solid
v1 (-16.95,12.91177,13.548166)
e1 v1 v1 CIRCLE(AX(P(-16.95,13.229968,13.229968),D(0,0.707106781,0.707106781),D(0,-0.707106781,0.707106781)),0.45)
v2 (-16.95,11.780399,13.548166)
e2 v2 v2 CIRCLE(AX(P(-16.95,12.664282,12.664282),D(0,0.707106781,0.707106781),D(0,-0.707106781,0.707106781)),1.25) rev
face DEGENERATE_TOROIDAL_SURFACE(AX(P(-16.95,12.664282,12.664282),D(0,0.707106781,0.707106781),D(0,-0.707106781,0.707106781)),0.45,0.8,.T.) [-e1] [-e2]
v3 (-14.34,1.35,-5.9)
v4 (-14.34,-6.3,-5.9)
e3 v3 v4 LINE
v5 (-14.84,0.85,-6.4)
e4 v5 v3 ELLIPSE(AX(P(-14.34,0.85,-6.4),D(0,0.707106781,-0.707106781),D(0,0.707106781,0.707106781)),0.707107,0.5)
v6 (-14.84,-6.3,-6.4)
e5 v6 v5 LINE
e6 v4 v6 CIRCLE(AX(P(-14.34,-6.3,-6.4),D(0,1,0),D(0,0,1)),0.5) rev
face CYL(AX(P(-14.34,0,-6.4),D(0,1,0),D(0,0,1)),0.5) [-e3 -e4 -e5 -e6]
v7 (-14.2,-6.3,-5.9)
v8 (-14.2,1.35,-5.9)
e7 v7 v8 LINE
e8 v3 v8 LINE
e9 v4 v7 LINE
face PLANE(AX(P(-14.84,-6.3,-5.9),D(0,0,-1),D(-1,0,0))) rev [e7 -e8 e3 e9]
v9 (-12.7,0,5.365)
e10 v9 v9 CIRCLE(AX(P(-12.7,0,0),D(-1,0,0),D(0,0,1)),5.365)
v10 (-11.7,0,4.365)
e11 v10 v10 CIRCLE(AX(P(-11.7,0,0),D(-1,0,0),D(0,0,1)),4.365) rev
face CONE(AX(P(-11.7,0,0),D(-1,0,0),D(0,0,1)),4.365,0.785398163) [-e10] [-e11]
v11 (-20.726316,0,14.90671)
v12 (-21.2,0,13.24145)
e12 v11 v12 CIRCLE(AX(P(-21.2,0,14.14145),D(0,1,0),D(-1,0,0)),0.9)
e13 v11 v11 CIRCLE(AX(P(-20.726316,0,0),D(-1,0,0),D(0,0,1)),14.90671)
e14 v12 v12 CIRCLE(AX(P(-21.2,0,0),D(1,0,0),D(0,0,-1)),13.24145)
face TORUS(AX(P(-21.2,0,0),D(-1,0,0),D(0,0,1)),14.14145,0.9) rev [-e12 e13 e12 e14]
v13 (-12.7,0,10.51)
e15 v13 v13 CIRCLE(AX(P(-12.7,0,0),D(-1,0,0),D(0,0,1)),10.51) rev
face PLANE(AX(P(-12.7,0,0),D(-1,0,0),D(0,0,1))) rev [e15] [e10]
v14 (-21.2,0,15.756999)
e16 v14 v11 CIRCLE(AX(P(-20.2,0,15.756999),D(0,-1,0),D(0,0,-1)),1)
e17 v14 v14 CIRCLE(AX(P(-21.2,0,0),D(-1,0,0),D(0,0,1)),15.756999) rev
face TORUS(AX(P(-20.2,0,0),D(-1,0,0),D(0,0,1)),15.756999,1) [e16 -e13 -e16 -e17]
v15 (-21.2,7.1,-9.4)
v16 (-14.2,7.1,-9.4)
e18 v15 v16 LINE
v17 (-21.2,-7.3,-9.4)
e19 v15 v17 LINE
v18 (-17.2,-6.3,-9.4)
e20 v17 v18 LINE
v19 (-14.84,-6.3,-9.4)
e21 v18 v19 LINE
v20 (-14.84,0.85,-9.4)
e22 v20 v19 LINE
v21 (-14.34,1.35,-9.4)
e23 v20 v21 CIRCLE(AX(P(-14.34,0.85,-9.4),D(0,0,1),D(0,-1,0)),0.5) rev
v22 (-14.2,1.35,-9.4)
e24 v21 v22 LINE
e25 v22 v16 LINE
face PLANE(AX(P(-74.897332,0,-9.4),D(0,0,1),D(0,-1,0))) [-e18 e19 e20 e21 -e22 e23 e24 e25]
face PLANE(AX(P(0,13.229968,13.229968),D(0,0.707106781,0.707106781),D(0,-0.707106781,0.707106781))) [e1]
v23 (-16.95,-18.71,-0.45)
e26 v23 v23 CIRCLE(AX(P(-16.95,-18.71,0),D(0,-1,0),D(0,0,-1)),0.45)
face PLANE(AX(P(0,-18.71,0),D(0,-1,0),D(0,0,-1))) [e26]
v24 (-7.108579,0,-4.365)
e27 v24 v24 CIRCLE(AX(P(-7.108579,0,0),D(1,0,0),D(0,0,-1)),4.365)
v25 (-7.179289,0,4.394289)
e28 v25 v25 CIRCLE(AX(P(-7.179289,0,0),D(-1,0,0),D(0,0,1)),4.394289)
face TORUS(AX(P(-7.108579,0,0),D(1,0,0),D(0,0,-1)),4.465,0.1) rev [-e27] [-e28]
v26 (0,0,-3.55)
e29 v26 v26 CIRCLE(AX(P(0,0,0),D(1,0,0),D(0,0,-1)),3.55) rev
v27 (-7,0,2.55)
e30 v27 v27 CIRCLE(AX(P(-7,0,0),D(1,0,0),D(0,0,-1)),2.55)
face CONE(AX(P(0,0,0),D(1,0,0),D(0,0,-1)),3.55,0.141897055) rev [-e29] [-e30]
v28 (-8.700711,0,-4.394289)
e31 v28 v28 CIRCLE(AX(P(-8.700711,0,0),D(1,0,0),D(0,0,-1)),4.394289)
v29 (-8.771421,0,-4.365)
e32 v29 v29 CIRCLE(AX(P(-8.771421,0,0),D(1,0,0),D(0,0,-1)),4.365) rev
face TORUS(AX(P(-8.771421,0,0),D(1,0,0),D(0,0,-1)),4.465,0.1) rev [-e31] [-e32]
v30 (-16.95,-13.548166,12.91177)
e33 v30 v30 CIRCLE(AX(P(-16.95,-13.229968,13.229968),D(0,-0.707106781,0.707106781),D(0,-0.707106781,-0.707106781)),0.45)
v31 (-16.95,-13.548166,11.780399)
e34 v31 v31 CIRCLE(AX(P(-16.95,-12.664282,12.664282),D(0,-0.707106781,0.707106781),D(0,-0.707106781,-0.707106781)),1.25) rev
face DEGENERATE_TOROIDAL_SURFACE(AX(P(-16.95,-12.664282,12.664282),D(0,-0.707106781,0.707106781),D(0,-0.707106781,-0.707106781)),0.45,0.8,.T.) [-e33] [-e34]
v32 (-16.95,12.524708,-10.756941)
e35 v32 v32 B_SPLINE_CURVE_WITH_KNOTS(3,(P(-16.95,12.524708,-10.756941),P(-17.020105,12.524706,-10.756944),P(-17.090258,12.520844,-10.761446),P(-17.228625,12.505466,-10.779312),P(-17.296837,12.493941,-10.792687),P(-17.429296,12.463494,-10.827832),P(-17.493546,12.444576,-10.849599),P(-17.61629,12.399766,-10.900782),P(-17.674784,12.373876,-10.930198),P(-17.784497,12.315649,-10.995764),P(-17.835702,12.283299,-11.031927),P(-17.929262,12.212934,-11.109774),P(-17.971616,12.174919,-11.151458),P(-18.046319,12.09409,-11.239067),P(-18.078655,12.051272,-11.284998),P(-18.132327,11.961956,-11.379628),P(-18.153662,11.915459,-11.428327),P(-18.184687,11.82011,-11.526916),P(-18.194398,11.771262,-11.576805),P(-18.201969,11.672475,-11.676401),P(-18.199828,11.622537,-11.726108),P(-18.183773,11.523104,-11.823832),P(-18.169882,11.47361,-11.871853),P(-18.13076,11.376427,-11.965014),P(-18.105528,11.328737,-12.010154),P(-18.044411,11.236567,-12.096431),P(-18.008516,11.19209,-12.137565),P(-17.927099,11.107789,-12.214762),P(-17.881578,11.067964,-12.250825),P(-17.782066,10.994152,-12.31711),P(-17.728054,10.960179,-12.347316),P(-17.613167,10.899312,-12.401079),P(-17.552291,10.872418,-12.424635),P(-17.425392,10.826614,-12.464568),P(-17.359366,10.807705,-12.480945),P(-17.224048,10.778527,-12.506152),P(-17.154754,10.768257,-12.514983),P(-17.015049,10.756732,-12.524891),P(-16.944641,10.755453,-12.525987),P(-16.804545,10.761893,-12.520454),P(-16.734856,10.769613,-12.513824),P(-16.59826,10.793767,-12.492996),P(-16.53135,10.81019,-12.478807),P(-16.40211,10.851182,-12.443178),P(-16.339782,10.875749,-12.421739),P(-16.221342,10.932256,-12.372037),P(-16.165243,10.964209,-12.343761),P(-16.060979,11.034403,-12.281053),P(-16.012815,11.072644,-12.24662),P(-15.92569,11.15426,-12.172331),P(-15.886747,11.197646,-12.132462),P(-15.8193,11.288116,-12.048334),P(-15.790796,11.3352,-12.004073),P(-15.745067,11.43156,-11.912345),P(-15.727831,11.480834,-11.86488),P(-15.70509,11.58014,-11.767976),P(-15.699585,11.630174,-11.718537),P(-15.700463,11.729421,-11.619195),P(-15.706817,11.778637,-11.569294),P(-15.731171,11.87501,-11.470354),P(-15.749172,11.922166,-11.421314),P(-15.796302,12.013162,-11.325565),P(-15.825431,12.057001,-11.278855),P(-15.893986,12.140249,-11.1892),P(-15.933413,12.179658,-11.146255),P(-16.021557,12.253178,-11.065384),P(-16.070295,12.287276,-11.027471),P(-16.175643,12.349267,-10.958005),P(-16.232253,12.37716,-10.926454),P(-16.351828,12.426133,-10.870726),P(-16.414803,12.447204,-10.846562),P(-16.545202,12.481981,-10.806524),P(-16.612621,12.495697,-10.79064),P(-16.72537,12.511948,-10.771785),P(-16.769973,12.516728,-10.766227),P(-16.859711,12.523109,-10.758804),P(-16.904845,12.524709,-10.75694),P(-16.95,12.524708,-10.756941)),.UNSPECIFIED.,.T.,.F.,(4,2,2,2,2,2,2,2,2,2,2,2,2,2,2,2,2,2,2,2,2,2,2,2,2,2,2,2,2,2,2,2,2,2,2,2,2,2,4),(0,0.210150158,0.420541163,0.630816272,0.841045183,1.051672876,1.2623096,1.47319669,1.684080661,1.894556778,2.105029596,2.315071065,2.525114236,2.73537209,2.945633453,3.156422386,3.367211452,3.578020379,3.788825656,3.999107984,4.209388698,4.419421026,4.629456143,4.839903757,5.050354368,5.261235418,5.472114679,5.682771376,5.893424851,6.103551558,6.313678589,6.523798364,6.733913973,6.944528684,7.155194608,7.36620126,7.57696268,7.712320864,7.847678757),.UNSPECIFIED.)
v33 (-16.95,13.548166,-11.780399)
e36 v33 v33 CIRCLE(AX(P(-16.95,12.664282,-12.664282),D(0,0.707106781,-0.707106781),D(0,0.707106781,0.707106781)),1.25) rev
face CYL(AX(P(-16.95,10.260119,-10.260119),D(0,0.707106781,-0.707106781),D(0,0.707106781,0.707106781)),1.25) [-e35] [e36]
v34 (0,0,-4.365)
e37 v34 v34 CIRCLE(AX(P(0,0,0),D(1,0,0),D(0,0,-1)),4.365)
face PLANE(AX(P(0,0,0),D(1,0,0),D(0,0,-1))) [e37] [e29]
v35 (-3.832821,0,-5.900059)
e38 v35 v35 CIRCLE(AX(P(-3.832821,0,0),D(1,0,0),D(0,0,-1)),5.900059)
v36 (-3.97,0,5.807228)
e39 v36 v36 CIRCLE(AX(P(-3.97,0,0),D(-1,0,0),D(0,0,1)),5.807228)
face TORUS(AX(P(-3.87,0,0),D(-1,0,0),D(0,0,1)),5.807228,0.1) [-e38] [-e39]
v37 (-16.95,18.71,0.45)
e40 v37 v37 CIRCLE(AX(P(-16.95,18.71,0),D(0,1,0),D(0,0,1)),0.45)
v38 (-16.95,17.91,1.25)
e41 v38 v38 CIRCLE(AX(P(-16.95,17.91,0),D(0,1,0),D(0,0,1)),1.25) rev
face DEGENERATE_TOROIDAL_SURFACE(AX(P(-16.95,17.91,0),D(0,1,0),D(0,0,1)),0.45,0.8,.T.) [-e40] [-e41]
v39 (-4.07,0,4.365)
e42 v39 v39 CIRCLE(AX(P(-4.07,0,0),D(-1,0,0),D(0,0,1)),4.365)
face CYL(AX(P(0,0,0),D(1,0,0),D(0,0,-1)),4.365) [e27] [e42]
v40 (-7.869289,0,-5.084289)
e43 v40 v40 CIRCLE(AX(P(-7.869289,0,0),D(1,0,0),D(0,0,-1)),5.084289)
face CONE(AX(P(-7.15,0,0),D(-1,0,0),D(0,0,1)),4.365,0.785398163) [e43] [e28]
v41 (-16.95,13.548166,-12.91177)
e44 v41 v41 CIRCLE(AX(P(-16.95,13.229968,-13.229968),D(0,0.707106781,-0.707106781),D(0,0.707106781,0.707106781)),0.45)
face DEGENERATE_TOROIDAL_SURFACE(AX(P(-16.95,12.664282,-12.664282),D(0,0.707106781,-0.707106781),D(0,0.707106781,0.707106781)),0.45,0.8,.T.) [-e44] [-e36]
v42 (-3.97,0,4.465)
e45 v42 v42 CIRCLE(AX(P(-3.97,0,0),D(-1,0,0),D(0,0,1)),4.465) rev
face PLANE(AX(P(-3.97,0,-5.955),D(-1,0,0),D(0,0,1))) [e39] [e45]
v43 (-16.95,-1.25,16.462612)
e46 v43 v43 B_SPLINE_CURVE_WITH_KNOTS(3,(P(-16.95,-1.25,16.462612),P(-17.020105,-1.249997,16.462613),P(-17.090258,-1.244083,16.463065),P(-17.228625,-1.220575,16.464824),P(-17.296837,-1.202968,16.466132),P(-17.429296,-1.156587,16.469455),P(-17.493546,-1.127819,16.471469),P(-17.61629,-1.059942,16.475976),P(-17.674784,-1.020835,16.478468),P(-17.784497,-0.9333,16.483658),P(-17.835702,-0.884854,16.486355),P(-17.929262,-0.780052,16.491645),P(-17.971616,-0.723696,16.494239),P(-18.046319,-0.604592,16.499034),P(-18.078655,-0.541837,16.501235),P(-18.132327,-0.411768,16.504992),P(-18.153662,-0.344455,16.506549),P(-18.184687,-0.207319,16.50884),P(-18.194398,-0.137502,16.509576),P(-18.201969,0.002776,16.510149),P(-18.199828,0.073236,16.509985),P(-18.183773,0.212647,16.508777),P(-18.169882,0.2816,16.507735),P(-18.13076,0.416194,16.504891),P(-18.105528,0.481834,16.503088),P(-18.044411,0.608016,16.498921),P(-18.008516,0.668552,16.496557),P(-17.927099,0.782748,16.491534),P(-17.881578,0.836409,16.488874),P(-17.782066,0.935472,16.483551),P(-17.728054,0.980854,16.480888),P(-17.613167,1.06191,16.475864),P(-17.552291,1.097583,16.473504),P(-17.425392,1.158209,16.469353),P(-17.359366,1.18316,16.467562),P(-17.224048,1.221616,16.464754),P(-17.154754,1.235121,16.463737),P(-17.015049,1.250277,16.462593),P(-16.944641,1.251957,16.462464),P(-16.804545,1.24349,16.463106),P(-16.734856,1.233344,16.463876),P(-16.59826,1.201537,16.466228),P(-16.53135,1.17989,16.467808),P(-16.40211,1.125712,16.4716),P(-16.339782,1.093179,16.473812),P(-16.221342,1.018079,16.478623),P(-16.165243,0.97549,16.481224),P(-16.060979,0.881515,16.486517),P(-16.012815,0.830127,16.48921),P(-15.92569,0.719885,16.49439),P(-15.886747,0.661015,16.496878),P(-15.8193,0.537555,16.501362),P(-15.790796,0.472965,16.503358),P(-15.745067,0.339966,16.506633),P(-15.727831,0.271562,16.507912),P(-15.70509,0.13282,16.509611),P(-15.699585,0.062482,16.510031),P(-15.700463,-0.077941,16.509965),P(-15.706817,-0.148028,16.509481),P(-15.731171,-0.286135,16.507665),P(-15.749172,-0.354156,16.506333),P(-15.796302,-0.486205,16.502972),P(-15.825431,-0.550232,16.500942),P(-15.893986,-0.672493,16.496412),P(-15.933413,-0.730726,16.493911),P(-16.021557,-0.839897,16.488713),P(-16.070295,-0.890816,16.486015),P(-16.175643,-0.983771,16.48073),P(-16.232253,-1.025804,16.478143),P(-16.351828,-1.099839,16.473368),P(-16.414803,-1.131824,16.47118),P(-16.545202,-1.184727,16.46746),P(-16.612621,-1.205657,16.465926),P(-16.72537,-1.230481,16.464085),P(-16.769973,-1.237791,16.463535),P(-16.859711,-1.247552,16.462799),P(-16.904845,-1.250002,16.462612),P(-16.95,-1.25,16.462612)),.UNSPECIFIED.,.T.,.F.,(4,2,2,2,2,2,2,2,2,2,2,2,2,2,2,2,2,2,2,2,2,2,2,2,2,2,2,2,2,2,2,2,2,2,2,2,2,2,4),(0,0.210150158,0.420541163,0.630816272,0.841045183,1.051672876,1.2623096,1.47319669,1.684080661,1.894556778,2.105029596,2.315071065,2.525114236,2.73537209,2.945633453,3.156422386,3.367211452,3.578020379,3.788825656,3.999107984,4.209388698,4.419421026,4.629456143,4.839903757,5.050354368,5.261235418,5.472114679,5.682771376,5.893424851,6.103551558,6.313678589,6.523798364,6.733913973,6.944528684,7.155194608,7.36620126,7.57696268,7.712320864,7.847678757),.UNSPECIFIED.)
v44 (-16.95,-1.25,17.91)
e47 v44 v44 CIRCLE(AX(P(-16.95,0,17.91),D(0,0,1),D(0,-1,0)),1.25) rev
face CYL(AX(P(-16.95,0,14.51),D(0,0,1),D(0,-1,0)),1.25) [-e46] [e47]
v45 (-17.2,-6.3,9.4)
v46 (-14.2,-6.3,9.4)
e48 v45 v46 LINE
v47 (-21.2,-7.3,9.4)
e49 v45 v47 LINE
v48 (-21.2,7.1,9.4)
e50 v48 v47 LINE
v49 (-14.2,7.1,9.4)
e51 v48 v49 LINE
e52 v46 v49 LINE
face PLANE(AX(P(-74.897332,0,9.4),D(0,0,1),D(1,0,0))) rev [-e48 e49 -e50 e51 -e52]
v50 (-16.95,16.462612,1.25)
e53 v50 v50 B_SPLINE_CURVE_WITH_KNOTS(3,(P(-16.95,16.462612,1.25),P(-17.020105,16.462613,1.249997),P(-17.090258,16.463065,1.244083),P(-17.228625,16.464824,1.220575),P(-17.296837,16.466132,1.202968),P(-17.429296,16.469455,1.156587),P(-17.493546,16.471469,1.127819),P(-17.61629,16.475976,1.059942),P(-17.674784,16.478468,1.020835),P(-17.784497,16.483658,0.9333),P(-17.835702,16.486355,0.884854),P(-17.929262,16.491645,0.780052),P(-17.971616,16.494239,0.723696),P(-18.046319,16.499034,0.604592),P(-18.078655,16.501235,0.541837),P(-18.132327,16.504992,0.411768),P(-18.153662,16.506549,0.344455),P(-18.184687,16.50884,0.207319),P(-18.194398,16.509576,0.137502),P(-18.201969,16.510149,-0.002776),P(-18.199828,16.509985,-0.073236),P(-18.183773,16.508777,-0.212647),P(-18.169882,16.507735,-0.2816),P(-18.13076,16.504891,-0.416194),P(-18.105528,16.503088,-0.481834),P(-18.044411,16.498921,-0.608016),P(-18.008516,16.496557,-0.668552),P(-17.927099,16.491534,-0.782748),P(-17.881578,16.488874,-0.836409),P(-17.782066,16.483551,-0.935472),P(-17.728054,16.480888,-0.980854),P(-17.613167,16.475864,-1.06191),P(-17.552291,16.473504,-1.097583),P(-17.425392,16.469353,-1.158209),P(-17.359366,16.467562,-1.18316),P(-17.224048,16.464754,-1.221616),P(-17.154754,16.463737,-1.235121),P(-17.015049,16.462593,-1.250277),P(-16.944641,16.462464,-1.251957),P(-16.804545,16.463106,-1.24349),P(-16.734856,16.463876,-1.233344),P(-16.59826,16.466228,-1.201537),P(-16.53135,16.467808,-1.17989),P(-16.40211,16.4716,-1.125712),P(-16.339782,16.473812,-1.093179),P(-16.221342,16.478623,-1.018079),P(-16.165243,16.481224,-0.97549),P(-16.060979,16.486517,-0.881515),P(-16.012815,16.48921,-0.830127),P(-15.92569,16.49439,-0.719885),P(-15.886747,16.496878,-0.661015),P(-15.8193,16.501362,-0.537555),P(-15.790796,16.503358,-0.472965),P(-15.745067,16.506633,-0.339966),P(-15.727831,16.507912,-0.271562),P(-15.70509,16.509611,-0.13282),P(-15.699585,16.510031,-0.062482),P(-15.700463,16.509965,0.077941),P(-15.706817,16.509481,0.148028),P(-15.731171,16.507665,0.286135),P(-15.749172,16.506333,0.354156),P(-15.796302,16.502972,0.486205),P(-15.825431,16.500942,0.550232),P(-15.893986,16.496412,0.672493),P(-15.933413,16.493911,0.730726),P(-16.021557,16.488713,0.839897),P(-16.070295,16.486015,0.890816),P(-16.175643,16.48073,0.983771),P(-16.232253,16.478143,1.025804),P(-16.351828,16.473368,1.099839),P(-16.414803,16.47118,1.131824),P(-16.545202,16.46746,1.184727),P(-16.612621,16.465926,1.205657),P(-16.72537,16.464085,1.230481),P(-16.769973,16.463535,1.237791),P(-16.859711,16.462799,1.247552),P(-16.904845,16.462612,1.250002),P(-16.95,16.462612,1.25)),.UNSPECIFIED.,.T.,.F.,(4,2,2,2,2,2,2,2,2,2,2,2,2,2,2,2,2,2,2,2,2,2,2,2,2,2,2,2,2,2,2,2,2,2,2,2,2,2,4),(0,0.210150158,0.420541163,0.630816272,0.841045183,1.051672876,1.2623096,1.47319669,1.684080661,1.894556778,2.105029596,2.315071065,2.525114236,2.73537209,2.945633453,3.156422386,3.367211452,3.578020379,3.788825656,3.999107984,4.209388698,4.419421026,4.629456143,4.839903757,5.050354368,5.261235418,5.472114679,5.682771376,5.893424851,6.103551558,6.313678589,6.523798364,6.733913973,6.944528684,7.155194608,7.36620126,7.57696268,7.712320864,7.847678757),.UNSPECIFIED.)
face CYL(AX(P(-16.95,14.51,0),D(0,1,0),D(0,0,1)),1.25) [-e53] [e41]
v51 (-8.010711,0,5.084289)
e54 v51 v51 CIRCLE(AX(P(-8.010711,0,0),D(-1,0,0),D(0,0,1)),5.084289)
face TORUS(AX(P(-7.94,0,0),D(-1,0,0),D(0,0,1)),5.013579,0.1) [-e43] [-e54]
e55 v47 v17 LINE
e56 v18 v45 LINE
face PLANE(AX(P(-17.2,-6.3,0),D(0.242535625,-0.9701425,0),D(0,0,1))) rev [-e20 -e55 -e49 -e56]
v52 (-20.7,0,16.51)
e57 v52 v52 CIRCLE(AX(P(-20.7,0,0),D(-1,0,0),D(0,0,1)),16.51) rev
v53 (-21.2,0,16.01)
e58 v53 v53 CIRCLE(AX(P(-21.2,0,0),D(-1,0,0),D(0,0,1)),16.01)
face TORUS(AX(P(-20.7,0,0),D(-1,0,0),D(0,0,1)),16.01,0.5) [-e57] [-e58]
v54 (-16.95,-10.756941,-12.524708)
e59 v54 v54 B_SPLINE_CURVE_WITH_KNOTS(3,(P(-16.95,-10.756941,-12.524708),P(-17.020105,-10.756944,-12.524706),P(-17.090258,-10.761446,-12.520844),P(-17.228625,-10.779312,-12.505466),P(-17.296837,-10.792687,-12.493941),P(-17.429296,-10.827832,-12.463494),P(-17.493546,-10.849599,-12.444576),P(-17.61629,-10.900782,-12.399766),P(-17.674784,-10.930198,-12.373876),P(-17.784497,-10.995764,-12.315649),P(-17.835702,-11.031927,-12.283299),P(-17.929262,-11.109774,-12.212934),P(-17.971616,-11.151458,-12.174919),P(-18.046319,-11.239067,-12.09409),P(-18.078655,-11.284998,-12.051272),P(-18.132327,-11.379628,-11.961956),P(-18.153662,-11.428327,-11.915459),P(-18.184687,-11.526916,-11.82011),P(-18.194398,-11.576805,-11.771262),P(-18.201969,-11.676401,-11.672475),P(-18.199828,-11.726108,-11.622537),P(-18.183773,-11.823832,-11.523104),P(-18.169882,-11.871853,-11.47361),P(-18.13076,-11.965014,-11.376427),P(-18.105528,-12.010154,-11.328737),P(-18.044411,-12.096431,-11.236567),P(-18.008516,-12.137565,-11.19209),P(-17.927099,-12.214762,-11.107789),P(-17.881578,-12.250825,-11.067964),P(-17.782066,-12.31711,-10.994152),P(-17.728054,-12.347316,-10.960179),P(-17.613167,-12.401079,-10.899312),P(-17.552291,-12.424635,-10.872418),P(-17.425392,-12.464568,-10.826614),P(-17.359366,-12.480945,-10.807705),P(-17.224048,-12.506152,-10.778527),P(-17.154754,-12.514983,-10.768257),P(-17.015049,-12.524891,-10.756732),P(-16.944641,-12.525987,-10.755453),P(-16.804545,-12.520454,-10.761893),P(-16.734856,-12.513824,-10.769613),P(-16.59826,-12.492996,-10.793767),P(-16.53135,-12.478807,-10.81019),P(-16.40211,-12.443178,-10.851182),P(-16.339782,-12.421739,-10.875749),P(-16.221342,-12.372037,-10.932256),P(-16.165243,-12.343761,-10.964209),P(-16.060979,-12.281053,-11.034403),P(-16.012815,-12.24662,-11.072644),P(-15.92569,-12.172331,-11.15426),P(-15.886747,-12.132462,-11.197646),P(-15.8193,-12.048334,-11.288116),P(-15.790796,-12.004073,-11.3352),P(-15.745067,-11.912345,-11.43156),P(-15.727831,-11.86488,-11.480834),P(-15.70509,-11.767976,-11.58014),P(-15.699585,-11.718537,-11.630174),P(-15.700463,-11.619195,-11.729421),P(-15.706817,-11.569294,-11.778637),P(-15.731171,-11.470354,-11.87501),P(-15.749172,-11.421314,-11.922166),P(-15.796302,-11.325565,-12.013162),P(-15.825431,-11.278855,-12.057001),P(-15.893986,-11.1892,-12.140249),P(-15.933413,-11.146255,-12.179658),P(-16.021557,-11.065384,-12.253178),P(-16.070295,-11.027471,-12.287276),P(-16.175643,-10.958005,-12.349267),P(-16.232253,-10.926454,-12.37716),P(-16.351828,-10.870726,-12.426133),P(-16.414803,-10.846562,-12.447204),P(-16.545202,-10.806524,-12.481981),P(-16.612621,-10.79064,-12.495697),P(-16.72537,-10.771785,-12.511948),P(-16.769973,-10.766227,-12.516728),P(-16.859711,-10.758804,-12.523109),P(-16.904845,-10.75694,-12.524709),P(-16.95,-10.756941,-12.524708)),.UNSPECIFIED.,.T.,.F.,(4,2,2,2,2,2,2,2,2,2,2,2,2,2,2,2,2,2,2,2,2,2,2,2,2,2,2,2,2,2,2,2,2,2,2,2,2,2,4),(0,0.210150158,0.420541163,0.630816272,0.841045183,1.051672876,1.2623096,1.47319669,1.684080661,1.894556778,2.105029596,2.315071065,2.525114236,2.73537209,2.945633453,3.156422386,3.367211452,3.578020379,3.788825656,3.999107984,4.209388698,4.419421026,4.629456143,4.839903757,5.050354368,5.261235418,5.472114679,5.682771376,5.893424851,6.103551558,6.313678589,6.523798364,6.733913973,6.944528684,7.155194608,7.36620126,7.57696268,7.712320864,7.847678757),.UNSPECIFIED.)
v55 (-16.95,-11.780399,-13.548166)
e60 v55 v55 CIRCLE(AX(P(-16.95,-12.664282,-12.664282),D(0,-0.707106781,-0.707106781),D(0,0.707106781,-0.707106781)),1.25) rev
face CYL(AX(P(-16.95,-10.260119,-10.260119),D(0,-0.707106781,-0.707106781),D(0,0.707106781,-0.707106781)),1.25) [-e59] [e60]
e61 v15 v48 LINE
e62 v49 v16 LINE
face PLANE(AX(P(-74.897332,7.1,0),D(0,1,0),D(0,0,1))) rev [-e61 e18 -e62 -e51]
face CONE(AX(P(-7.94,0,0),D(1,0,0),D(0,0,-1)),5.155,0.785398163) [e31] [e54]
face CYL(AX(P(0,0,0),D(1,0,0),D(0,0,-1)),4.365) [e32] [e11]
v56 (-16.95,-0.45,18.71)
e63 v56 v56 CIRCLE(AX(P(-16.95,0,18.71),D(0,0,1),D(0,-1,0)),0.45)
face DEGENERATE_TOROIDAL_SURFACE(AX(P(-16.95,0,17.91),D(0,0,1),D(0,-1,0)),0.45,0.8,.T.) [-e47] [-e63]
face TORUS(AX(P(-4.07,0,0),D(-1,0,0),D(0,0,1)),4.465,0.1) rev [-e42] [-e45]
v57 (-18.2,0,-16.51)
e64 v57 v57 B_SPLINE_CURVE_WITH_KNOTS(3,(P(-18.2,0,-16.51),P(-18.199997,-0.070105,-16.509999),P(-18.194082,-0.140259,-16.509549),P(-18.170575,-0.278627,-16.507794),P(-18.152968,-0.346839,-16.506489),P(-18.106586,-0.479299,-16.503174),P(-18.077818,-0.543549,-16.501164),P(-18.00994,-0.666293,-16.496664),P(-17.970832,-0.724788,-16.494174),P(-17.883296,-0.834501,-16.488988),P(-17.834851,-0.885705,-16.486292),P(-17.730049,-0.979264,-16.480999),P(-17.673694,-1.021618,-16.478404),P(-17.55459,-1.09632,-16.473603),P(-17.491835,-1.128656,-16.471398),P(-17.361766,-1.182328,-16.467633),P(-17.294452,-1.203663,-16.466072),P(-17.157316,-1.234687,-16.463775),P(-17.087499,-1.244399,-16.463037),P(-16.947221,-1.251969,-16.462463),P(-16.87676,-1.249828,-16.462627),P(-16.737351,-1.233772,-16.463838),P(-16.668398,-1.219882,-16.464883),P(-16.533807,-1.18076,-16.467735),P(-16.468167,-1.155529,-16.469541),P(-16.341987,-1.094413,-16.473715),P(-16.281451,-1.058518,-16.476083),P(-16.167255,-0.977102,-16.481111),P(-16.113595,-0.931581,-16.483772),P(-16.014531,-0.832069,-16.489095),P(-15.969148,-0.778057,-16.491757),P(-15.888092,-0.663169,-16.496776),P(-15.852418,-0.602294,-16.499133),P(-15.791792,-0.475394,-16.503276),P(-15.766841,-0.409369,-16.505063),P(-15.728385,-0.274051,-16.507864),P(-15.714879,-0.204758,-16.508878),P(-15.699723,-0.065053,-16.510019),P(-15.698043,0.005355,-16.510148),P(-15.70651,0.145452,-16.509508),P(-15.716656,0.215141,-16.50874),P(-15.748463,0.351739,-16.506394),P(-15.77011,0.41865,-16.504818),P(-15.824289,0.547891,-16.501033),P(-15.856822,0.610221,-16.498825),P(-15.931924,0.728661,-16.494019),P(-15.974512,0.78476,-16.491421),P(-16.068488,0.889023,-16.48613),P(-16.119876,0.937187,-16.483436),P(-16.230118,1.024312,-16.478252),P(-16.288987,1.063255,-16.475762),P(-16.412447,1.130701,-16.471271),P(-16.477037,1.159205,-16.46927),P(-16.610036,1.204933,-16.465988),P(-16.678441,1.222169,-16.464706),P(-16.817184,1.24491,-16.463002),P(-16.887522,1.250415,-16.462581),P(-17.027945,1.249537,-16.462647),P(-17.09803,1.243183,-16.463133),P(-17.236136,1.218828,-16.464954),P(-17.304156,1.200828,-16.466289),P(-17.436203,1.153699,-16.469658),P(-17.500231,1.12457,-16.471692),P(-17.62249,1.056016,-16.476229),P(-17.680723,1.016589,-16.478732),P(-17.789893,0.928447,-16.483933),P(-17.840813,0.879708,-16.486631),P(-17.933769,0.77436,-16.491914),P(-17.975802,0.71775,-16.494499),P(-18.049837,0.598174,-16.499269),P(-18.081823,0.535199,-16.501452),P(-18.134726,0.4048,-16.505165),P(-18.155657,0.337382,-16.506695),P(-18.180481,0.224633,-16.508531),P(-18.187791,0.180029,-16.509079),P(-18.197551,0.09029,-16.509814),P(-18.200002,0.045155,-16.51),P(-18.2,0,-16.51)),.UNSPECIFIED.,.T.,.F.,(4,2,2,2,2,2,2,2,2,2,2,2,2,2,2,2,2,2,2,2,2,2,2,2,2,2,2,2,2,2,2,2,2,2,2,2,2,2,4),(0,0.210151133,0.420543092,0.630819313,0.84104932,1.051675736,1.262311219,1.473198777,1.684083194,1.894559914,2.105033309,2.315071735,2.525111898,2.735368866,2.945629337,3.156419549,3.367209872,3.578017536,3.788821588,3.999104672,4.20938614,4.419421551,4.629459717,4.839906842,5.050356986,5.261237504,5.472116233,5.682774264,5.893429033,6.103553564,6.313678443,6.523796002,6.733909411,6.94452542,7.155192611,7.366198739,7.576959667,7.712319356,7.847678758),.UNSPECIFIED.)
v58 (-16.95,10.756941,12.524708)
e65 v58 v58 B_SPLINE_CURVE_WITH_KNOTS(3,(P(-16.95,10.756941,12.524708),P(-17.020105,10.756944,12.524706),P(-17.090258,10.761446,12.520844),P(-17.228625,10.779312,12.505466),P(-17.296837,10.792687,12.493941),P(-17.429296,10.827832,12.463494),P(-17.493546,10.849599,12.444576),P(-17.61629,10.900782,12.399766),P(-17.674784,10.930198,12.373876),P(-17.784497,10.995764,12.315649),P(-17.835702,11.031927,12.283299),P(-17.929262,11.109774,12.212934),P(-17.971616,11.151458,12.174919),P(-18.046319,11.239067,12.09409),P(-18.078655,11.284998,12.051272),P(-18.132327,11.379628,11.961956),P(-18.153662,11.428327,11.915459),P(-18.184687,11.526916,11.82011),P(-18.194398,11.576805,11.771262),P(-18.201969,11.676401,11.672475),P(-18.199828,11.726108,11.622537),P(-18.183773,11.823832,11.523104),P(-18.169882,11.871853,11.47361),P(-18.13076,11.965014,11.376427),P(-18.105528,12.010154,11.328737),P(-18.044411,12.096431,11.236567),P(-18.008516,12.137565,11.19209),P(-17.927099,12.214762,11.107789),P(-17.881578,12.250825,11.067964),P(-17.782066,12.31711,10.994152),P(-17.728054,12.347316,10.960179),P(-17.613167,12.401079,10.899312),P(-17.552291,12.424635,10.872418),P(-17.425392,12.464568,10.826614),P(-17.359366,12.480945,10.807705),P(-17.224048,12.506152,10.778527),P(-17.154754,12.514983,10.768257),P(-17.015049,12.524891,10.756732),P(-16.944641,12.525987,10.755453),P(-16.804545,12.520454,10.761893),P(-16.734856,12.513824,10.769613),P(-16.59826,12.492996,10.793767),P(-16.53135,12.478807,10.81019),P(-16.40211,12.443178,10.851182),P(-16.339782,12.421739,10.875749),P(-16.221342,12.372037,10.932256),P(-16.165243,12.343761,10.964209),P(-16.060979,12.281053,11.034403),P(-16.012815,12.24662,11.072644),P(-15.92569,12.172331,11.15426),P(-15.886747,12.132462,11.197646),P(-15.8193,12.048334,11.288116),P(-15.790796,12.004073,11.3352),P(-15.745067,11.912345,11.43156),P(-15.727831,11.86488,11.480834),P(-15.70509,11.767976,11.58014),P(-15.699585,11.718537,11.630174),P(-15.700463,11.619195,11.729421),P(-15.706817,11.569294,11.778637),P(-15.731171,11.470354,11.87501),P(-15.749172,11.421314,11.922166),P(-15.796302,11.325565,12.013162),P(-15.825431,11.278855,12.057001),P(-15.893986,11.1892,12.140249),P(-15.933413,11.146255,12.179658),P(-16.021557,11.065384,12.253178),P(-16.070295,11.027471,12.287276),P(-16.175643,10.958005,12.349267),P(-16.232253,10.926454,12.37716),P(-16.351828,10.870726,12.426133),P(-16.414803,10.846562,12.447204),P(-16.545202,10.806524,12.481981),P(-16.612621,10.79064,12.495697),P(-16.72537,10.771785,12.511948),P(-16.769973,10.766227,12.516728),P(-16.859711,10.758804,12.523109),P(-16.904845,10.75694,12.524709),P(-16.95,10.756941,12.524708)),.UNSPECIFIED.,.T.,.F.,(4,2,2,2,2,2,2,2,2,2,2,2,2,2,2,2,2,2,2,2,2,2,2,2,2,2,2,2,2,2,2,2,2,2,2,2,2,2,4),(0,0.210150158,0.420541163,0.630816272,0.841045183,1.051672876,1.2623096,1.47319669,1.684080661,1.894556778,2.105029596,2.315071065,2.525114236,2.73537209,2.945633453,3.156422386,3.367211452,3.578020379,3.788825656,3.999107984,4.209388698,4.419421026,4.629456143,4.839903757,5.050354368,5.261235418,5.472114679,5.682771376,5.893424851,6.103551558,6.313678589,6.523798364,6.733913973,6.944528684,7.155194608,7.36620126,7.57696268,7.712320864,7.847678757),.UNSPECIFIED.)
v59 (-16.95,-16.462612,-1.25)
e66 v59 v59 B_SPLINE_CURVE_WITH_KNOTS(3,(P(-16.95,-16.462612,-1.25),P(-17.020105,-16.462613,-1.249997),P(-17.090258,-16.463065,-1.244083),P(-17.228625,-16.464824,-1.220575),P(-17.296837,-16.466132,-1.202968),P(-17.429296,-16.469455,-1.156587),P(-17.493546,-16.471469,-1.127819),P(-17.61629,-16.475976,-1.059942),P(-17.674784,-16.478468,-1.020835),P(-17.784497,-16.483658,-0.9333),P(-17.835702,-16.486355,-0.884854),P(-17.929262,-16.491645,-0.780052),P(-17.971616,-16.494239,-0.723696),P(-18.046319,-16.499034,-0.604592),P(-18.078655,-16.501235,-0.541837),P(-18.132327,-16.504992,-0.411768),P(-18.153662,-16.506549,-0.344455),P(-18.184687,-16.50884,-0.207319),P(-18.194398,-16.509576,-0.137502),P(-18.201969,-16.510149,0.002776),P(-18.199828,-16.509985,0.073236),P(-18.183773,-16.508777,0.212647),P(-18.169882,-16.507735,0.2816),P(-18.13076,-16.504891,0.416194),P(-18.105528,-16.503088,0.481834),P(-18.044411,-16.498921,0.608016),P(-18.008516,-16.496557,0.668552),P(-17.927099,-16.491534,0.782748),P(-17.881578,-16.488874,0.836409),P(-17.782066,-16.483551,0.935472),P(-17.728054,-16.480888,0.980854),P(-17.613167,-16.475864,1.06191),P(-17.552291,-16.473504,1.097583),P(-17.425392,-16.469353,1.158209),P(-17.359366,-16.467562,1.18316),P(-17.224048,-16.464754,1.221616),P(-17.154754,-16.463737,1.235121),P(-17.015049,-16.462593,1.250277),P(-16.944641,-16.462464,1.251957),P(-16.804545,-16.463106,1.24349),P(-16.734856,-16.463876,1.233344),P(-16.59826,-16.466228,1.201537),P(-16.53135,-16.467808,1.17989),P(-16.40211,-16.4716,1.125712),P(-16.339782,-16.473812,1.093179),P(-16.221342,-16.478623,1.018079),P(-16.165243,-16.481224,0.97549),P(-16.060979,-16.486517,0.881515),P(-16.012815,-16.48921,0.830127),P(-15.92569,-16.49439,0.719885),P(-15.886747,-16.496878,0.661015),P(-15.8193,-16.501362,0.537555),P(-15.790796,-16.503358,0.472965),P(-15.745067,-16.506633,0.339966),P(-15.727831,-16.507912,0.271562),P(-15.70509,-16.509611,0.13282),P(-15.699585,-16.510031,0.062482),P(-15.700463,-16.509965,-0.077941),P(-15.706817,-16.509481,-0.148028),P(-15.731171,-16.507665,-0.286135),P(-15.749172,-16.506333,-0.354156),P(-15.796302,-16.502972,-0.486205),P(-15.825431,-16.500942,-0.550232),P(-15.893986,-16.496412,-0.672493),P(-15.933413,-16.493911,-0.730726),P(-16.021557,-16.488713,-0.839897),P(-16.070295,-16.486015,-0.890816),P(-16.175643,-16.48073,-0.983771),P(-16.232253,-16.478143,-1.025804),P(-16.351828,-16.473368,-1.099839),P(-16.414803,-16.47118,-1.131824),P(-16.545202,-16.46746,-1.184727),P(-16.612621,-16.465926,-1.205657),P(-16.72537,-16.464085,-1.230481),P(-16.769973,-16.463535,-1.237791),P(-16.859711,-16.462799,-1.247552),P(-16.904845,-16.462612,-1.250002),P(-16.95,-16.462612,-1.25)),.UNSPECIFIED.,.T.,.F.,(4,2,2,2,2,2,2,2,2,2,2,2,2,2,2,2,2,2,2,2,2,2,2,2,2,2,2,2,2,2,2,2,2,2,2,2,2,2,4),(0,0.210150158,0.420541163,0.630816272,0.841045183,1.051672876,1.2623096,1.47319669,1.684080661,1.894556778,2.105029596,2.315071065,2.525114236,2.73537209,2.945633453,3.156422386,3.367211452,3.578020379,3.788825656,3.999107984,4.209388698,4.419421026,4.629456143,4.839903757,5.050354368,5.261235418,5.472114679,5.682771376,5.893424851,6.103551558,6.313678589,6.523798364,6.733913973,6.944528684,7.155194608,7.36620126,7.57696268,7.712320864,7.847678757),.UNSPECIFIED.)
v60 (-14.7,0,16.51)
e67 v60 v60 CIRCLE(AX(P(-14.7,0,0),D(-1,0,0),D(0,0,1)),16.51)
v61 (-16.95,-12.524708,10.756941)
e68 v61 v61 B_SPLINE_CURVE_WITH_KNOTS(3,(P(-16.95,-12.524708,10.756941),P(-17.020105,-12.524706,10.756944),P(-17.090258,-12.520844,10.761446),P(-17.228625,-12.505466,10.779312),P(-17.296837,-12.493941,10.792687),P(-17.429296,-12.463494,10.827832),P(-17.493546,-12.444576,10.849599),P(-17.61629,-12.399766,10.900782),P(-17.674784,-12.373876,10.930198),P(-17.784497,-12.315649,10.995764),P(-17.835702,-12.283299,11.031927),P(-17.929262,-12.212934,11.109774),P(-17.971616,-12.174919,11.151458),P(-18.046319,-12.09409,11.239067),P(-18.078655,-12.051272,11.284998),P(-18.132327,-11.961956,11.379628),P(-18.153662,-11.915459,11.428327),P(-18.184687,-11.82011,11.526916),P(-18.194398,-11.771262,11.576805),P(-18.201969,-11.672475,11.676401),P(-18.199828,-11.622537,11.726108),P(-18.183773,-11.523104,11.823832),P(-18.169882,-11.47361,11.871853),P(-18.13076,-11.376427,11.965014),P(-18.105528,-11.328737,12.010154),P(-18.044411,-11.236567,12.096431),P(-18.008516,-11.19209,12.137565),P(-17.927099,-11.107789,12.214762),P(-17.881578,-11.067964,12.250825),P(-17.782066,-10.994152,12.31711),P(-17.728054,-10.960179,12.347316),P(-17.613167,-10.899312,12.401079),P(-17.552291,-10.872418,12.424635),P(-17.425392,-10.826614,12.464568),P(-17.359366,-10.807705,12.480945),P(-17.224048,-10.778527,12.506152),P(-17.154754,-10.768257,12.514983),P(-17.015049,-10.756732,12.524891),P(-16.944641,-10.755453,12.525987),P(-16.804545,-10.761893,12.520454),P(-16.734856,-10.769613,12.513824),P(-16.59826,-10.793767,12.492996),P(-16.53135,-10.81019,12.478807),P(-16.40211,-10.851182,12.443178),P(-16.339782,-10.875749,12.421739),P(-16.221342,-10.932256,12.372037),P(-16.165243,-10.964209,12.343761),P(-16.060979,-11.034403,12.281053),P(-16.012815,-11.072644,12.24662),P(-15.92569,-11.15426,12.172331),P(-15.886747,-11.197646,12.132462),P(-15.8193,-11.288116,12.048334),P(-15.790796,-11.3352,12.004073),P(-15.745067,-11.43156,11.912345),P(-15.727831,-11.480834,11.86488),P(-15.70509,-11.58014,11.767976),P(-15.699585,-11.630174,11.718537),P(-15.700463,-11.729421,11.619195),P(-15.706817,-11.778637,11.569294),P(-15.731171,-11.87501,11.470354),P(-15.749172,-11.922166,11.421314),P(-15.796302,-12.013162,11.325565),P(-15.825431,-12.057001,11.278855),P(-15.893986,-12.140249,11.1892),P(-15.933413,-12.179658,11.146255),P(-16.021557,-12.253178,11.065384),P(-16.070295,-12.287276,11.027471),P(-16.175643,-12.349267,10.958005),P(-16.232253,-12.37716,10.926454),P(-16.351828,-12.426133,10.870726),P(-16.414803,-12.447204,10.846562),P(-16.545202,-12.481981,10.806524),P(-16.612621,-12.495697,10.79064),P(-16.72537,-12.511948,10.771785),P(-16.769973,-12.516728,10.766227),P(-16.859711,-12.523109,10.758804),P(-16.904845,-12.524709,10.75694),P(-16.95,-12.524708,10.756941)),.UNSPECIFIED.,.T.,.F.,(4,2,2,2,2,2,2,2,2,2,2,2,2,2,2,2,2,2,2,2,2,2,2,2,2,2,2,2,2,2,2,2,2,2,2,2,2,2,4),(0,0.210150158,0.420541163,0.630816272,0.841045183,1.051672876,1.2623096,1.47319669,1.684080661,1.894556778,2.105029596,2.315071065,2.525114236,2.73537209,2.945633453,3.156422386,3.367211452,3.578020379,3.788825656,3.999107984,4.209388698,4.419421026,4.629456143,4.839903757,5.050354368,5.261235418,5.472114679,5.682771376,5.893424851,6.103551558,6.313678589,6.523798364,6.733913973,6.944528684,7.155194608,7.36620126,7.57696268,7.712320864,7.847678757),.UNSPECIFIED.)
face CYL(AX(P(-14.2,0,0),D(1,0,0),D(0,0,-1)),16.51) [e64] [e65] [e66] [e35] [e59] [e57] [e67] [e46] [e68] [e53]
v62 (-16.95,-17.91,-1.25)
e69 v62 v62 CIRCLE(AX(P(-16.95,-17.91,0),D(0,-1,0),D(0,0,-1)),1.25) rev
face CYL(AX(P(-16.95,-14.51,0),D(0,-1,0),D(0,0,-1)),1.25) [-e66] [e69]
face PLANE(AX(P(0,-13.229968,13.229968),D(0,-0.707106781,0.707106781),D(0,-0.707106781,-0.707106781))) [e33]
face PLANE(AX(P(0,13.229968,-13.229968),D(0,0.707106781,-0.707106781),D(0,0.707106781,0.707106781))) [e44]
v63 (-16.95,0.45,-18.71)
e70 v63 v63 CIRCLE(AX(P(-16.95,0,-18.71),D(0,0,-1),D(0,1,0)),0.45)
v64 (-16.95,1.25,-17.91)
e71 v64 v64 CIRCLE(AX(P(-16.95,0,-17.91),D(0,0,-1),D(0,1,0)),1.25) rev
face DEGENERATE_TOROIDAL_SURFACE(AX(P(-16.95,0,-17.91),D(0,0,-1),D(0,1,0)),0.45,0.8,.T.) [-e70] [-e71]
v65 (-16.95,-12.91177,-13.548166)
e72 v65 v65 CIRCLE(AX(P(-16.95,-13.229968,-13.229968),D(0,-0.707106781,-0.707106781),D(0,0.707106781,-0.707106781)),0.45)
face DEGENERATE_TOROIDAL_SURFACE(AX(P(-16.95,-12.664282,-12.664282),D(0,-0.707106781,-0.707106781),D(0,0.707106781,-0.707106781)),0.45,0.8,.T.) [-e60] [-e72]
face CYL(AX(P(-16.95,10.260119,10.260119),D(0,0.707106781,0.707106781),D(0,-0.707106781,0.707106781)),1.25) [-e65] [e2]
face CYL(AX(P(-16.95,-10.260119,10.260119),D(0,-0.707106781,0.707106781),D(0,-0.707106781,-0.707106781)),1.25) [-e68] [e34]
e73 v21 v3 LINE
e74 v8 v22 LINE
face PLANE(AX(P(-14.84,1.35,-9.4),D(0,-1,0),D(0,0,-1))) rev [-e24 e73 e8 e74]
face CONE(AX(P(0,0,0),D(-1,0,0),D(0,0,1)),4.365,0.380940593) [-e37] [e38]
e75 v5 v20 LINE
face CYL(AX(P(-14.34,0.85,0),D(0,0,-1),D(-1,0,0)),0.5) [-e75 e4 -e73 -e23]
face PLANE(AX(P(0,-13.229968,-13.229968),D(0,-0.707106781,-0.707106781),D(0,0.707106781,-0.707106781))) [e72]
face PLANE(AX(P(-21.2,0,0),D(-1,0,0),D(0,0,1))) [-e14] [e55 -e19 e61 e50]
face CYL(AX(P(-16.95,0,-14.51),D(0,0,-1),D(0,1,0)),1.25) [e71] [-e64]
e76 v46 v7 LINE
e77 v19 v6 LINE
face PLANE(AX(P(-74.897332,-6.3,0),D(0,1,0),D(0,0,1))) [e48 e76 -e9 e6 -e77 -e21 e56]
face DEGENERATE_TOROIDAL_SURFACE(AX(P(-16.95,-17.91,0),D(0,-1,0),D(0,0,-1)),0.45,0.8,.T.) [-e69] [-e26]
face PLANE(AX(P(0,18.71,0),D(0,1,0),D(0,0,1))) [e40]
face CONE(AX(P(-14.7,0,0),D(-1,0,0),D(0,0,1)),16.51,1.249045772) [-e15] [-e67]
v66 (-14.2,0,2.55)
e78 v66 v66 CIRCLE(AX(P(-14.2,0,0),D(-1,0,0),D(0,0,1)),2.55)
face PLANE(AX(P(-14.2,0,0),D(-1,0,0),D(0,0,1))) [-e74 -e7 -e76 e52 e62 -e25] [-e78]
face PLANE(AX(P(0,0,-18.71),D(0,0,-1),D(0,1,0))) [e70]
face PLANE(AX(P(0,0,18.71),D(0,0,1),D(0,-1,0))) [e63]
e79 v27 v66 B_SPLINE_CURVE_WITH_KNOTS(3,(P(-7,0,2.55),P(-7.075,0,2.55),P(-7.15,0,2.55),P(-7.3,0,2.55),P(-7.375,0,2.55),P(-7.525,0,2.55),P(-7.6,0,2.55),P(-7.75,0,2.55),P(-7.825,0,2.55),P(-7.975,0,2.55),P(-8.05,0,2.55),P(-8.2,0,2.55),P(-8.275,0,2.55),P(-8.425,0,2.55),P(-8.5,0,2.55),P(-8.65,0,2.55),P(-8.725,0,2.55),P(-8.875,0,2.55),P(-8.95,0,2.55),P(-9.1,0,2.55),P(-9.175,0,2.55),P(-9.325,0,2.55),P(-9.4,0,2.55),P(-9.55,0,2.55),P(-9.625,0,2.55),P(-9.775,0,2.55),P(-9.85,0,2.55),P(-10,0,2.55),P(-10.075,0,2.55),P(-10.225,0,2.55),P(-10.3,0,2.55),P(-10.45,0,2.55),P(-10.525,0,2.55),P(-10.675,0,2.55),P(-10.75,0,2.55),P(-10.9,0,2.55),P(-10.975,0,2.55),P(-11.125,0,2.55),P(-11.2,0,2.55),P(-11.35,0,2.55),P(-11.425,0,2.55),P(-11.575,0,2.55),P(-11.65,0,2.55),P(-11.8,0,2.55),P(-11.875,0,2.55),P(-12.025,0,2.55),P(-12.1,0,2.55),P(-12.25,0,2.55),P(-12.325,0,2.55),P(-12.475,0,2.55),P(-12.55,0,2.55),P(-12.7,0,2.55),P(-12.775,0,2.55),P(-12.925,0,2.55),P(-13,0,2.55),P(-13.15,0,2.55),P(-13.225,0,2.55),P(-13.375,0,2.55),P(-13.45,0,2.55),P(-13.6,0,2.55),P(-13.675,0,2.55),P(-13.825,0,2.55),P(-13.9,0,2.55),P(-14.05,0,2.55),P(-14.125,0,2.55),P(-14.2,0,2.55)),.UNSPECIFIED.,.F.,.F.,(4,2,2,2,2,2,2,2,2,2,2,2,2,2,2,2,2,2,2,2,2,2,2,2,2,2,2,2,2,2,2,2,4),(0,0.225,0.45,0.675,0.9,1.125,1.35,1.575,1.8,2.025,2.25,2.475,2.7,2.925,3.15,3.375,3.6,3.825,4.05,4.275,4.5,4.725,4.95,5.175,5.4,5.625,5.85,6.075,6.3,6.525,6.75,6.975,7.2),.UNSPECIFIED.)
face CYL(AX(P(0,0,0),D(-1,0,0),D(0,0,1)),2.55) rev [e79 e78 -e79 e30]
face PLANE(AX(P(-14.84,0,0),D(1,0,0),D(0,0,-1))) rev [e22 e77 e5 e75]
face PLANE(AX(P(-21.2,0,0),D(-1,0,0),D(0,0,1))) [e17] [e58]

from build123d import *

# Parameters (mm, degrees)
SKETCH2_R                 = 16.51
BOSS_EXTRUDE1_DEPTH       = 1.5
CUT_EXTRUDE1_DEPTH        = 27.579130911
CUT_EXTRUDE1_DEPTH_BACK   = 27.579130911
SKETCH2_5_R               = 2.55
SKETCH2_5_W               = 2.46
SKETCH2_5_H               = 4.35
SKETCH2_6_R               = 16.51
SKETCH2_6_W               = 18.8
SKETCH2_6_H               = 13.4
BOSS_EXTRUDE4_DEPTH       = 8.5
CUT_SWEEP1_PROFILE_R      = 0.9
CHAMFER1_SIZE             = 6
CHAMFER1_SIZE2            = 2
SKETCH18_W                = 3.5
SKETCH18_H                = 7.65
BOSS_EXTRUDE7_DEPTH       = 0.64
FILLET7_R                 = 0.5
CHAMFER5_SIZE             = 1
CHAMFER5_SIZE2            = 4
FILLET9_R                 = 0.5
FILLET10_R                = 0.1
BOSS_EXTRUDE8_START       = -2
BOSS_EXTRUDE8_DEPTH       = 4.2
FILLET11_R                = 0.8
CIRPATTERN4_COUNT         = 8
FILLET11_OF_CIRPATTERN4_R = 0.8
CHAMFER7_SIZE             = 1
CHAMFER8_SIZE             = 7
CHAMFER8_SIZE2            = 1


with BuildPart() as part:
    # Sketch1 → Revolve1 (revolve)
    with BuildSketch(Plane(origin=(0, 0, 0), x_dir=(1, 0, 0), z_dir=(0, 1, 0))):
        Polygon((0, 0), (-12.7, 0), (-12.7, 4.365), (-8.73, 4.365), (-7.94, 5.155), (-7.15, 4.365), (-3.97, 4.365), (-3.97, 5.955), (0, 4.365), align=None)
    revolve(axis=Axis((0, 0, 0), (-1, 0, 0)))

    # Sketch2 → Boss-Extrude1 (add)
    with BuildSketch(Plane.ZY.offset(12.7)):
        Circle(SKETCH2_R)
    extrude(amount=BOSS_EXTRUDE1_DEPTH)

    # Sketch2<5> → Cut-Extrude1 (cut, two sides: drawn at the far end of the back side and taken through both)
    # profile 1 of 2: a face of its own
    with BuildSketch(Plane.ZY.offset(12.7).offset(-CUT_EXTRUDE1_DEPTH_BACK)):
        Circle(SKETCH2_5_R)
        Rectangle(SKETCH2_5_W, SKETCH2_5_H, mode=Mode.SUBTRACT)
    # profile 2 of 2: a face of its own
    with BuildSketch(Plane.ZY.offset(12.7).offset(-CUT_EXTRUDE1_DEPTH_BACK)):
        Rectangle(SKETCH2_5_W, SKETCH2_5_H)
    extrude(amount=CUT_EXTRUDE1_DEPTH + CUT_EXTRUDE1_DEPTH_BACK, mode=Mode.SUBTRACT)

    # Sketch2<6> → Boss-Extrude4 (add)
    with BuildSketch(Plane.ZY.offset(12.7)):
        Circle(SKETCH2_6_R)
        with Locations((0, 0.4)):
            Rectangle(SKETCH2_6_W, SKETCH2_6_H, mode=Mode.SUBTRACT)
    extrude(amount=BOSS_EXTRUDE4_DEPTH)

    # Cut-Sweep1: sweep along a path in Sketch8
    with BuildLine(Plane.ZY.offset(21.2)) as cut_sweep1_path:
        CenterArc((0, 0), 14.14145, 0, 360)
    # Cut-Sweep1 profile (on start of the path) → Cut-Sweep1 (sweep, cut)
    with BuildSketch(Plane(origin=(-21.2, 0, 14.14145), x_dir=(0, 0, 1), z_dir=(0, 1, 0))):
        Circle(CUT_SWEEP1_PROFILE_R)
    sweep(path=cut_sweep1_path.line, mode=Mode.SUBTRACT)

    # Chamfer1
    chamfer1_edges = [part.edges().sort_by_distance(p)[0] for p in [
        (-12.7, 0, -16.51),
    ]]
    chamfer1_side = [part.faces().sort_by_distance(p)[0] for p in [
        (-12.7, 0, -16.043026682),
    ]]
    chamfer(chamfer1_edges, length=CHAMFER1_SIZE, length2=CHAMFER1_SIZE2, reference=chamfer1_side[0])

    # Sketch18 → Boss-Extrude7 (add)
    with BuildSketch(Plane.ZY.offset(14.2)):
        with Locations((-7.65, -2.475)):
            Rectangle(SKETCH18_W, SKETCH18_H)
    extrude(amount=BOSS_EXTRUDE7_DEPTH)

    # Fillet7
    fillet7_edges = [part.edges().sort_by_distance(p)[0] for p in [
        (-14.84, -2.475, -5.9),
        (-14.84, 1.35, -7.65),
    ]]
    fillet(fillet7_edges, radius=FILLET7_R)

    # Fillet8: read off the stored shape, not the designer's step
    # Fillet8 outline → Fillet8 (revolve, cut)
    with BuildSketch(Plane.YX):
        with BuildLine():
            Line((14.906710262, -21.2), (15.756999442, -21.2))
            ThreePointArc((15.756999442, -21.2), (15.270335179, -21.073589088), (14.906710262, -20.726315789))
            Line((14.906710262, -20.726315789), (14.906710262, -21.2))
        make_face()
    revolve(axis=Axis((0, 0, 0), (1, 0, 0)), mode=Mode.SUBTRACT)

    # Chamfer5
    chamfer5_edges = [part.edges().sort_by_distance(p)[0] for p in [
        (-21.2, -6.3, 0),
    ]]
    chamfer5_side = [part.faces().sort_by_distance(p)[0] for p in [
        (-21.2, 0, -12.866925236),
    ]]
    chamfer(chamfer5_edges, length=CHAMFER5_SIZE, length2=CHAMFER5_SIZE2, reference=chamfer5_side[0])

    # Fillet9
    fillet9_edges = [part.edges().sort_by_distance(p)[0] for p in [
        (-21.2, 0, -16.51),
    ]]
    fillet(fillet9_edges, radius=FILLET9_R)

    # Fillet10
    fillet10_edges = [part.edges().sort_by_distance(p)[0] for p in [
        (-3.97, 0, 4.365),
        (-3.97, 0, 5.955),
        (-8.73, 0, 4.365),
        (-7.94, 0, 5.155),
        (-7.15, 0, 4.365),
    ]]
    fillet(fillet10_edges, radius=FILLET10_R)

    # Sketch42 → Boss-Extrude8 (add)
    with BuildSketch(Plane(origin=(0, -16.51, 0), x_dir=(-1, 0, 0), z_dir=(0, -1, 0)).offset(BOSS_EXTRUDE8_START)):
        with BuildLine():
            ThreePointArc((15.7, 0), (16.95, -1.25), (18.2, 0))
            Line((18.2, 0), (15.7, 0))
        make_face()
        with BuildLine():
            Line((15.7, 0), (18.2, 0))
            ThreePointArc((18.2, 0), (16.95, 1.25), (15.7, 0))
        make_face()
    boss_extrude8 = extrude(amount=BOSS_EXTRUDE8_DEPTH)

    # Fillet11
    fillet11_edges = [part.edges().sort_by_distance(p)[0] for p in [
        (-15.7, -18.71, 0),
    ]]
    fillet(fillet11_edges, radius=FILLET11_R)

    # CirPattern4: Boss-Extrude8 ×8 about axis
    cirpattern4_axis = Axis((0, 0, 0), (1, 0, 0))
    for i in range(1, CIRPATTERN4_COUNT):
        add(boss_extrude8.rotate(cirpattern4_axis, i * 360 / CIRPATTERN4_COUNT))

    # Fillet11 of CirPattern4
    fillet11_of_cirpattern4_edges = [part.edges().sort_by_distance(p)[0] for p in [
        (-15.7, -13.229967876, -13.229967876),
        (-15.7, 0, -18.71),
        (-15.7, 13.229967876, -13.229967876),
        (-15.7, 18.71, 0),
        (-15.7, 13.229967876, 13.229967876),
        (-15.7, 0, 18.71),
        (-15.7, -13.229967876, 13.229967876),
    ]]
    fillet(fillet11_of_cirpattern4_edges, radius=FILLET11_OF_CIRPATTERN4_R)

    # Chamfer7
    chamfer7_edges = [part.edges().sort_by_distance(p)[0] for p in [
        (-12.7, 0, 4.365),
    ]]
    chamfer(chamfer7_edges, length=CHAMFER7_SIZE)

    # Chamfer8
    chamfer8_edges = [part.edges().sort_by_distance(p)[0] for p in [
        (0, 0, -2.55),
    ]]
    chamfer8_side = [part.faces().sort_by_distance(p)[0] for p in [
        (-6.35, 0, -2.55),
    ]]
    chamfer(chamfer8_edges, length=CHAMFER8_SIZE, length2=CHAMFER8_SIZE2, reference=chamfer8_side[0])


solid = part.part
